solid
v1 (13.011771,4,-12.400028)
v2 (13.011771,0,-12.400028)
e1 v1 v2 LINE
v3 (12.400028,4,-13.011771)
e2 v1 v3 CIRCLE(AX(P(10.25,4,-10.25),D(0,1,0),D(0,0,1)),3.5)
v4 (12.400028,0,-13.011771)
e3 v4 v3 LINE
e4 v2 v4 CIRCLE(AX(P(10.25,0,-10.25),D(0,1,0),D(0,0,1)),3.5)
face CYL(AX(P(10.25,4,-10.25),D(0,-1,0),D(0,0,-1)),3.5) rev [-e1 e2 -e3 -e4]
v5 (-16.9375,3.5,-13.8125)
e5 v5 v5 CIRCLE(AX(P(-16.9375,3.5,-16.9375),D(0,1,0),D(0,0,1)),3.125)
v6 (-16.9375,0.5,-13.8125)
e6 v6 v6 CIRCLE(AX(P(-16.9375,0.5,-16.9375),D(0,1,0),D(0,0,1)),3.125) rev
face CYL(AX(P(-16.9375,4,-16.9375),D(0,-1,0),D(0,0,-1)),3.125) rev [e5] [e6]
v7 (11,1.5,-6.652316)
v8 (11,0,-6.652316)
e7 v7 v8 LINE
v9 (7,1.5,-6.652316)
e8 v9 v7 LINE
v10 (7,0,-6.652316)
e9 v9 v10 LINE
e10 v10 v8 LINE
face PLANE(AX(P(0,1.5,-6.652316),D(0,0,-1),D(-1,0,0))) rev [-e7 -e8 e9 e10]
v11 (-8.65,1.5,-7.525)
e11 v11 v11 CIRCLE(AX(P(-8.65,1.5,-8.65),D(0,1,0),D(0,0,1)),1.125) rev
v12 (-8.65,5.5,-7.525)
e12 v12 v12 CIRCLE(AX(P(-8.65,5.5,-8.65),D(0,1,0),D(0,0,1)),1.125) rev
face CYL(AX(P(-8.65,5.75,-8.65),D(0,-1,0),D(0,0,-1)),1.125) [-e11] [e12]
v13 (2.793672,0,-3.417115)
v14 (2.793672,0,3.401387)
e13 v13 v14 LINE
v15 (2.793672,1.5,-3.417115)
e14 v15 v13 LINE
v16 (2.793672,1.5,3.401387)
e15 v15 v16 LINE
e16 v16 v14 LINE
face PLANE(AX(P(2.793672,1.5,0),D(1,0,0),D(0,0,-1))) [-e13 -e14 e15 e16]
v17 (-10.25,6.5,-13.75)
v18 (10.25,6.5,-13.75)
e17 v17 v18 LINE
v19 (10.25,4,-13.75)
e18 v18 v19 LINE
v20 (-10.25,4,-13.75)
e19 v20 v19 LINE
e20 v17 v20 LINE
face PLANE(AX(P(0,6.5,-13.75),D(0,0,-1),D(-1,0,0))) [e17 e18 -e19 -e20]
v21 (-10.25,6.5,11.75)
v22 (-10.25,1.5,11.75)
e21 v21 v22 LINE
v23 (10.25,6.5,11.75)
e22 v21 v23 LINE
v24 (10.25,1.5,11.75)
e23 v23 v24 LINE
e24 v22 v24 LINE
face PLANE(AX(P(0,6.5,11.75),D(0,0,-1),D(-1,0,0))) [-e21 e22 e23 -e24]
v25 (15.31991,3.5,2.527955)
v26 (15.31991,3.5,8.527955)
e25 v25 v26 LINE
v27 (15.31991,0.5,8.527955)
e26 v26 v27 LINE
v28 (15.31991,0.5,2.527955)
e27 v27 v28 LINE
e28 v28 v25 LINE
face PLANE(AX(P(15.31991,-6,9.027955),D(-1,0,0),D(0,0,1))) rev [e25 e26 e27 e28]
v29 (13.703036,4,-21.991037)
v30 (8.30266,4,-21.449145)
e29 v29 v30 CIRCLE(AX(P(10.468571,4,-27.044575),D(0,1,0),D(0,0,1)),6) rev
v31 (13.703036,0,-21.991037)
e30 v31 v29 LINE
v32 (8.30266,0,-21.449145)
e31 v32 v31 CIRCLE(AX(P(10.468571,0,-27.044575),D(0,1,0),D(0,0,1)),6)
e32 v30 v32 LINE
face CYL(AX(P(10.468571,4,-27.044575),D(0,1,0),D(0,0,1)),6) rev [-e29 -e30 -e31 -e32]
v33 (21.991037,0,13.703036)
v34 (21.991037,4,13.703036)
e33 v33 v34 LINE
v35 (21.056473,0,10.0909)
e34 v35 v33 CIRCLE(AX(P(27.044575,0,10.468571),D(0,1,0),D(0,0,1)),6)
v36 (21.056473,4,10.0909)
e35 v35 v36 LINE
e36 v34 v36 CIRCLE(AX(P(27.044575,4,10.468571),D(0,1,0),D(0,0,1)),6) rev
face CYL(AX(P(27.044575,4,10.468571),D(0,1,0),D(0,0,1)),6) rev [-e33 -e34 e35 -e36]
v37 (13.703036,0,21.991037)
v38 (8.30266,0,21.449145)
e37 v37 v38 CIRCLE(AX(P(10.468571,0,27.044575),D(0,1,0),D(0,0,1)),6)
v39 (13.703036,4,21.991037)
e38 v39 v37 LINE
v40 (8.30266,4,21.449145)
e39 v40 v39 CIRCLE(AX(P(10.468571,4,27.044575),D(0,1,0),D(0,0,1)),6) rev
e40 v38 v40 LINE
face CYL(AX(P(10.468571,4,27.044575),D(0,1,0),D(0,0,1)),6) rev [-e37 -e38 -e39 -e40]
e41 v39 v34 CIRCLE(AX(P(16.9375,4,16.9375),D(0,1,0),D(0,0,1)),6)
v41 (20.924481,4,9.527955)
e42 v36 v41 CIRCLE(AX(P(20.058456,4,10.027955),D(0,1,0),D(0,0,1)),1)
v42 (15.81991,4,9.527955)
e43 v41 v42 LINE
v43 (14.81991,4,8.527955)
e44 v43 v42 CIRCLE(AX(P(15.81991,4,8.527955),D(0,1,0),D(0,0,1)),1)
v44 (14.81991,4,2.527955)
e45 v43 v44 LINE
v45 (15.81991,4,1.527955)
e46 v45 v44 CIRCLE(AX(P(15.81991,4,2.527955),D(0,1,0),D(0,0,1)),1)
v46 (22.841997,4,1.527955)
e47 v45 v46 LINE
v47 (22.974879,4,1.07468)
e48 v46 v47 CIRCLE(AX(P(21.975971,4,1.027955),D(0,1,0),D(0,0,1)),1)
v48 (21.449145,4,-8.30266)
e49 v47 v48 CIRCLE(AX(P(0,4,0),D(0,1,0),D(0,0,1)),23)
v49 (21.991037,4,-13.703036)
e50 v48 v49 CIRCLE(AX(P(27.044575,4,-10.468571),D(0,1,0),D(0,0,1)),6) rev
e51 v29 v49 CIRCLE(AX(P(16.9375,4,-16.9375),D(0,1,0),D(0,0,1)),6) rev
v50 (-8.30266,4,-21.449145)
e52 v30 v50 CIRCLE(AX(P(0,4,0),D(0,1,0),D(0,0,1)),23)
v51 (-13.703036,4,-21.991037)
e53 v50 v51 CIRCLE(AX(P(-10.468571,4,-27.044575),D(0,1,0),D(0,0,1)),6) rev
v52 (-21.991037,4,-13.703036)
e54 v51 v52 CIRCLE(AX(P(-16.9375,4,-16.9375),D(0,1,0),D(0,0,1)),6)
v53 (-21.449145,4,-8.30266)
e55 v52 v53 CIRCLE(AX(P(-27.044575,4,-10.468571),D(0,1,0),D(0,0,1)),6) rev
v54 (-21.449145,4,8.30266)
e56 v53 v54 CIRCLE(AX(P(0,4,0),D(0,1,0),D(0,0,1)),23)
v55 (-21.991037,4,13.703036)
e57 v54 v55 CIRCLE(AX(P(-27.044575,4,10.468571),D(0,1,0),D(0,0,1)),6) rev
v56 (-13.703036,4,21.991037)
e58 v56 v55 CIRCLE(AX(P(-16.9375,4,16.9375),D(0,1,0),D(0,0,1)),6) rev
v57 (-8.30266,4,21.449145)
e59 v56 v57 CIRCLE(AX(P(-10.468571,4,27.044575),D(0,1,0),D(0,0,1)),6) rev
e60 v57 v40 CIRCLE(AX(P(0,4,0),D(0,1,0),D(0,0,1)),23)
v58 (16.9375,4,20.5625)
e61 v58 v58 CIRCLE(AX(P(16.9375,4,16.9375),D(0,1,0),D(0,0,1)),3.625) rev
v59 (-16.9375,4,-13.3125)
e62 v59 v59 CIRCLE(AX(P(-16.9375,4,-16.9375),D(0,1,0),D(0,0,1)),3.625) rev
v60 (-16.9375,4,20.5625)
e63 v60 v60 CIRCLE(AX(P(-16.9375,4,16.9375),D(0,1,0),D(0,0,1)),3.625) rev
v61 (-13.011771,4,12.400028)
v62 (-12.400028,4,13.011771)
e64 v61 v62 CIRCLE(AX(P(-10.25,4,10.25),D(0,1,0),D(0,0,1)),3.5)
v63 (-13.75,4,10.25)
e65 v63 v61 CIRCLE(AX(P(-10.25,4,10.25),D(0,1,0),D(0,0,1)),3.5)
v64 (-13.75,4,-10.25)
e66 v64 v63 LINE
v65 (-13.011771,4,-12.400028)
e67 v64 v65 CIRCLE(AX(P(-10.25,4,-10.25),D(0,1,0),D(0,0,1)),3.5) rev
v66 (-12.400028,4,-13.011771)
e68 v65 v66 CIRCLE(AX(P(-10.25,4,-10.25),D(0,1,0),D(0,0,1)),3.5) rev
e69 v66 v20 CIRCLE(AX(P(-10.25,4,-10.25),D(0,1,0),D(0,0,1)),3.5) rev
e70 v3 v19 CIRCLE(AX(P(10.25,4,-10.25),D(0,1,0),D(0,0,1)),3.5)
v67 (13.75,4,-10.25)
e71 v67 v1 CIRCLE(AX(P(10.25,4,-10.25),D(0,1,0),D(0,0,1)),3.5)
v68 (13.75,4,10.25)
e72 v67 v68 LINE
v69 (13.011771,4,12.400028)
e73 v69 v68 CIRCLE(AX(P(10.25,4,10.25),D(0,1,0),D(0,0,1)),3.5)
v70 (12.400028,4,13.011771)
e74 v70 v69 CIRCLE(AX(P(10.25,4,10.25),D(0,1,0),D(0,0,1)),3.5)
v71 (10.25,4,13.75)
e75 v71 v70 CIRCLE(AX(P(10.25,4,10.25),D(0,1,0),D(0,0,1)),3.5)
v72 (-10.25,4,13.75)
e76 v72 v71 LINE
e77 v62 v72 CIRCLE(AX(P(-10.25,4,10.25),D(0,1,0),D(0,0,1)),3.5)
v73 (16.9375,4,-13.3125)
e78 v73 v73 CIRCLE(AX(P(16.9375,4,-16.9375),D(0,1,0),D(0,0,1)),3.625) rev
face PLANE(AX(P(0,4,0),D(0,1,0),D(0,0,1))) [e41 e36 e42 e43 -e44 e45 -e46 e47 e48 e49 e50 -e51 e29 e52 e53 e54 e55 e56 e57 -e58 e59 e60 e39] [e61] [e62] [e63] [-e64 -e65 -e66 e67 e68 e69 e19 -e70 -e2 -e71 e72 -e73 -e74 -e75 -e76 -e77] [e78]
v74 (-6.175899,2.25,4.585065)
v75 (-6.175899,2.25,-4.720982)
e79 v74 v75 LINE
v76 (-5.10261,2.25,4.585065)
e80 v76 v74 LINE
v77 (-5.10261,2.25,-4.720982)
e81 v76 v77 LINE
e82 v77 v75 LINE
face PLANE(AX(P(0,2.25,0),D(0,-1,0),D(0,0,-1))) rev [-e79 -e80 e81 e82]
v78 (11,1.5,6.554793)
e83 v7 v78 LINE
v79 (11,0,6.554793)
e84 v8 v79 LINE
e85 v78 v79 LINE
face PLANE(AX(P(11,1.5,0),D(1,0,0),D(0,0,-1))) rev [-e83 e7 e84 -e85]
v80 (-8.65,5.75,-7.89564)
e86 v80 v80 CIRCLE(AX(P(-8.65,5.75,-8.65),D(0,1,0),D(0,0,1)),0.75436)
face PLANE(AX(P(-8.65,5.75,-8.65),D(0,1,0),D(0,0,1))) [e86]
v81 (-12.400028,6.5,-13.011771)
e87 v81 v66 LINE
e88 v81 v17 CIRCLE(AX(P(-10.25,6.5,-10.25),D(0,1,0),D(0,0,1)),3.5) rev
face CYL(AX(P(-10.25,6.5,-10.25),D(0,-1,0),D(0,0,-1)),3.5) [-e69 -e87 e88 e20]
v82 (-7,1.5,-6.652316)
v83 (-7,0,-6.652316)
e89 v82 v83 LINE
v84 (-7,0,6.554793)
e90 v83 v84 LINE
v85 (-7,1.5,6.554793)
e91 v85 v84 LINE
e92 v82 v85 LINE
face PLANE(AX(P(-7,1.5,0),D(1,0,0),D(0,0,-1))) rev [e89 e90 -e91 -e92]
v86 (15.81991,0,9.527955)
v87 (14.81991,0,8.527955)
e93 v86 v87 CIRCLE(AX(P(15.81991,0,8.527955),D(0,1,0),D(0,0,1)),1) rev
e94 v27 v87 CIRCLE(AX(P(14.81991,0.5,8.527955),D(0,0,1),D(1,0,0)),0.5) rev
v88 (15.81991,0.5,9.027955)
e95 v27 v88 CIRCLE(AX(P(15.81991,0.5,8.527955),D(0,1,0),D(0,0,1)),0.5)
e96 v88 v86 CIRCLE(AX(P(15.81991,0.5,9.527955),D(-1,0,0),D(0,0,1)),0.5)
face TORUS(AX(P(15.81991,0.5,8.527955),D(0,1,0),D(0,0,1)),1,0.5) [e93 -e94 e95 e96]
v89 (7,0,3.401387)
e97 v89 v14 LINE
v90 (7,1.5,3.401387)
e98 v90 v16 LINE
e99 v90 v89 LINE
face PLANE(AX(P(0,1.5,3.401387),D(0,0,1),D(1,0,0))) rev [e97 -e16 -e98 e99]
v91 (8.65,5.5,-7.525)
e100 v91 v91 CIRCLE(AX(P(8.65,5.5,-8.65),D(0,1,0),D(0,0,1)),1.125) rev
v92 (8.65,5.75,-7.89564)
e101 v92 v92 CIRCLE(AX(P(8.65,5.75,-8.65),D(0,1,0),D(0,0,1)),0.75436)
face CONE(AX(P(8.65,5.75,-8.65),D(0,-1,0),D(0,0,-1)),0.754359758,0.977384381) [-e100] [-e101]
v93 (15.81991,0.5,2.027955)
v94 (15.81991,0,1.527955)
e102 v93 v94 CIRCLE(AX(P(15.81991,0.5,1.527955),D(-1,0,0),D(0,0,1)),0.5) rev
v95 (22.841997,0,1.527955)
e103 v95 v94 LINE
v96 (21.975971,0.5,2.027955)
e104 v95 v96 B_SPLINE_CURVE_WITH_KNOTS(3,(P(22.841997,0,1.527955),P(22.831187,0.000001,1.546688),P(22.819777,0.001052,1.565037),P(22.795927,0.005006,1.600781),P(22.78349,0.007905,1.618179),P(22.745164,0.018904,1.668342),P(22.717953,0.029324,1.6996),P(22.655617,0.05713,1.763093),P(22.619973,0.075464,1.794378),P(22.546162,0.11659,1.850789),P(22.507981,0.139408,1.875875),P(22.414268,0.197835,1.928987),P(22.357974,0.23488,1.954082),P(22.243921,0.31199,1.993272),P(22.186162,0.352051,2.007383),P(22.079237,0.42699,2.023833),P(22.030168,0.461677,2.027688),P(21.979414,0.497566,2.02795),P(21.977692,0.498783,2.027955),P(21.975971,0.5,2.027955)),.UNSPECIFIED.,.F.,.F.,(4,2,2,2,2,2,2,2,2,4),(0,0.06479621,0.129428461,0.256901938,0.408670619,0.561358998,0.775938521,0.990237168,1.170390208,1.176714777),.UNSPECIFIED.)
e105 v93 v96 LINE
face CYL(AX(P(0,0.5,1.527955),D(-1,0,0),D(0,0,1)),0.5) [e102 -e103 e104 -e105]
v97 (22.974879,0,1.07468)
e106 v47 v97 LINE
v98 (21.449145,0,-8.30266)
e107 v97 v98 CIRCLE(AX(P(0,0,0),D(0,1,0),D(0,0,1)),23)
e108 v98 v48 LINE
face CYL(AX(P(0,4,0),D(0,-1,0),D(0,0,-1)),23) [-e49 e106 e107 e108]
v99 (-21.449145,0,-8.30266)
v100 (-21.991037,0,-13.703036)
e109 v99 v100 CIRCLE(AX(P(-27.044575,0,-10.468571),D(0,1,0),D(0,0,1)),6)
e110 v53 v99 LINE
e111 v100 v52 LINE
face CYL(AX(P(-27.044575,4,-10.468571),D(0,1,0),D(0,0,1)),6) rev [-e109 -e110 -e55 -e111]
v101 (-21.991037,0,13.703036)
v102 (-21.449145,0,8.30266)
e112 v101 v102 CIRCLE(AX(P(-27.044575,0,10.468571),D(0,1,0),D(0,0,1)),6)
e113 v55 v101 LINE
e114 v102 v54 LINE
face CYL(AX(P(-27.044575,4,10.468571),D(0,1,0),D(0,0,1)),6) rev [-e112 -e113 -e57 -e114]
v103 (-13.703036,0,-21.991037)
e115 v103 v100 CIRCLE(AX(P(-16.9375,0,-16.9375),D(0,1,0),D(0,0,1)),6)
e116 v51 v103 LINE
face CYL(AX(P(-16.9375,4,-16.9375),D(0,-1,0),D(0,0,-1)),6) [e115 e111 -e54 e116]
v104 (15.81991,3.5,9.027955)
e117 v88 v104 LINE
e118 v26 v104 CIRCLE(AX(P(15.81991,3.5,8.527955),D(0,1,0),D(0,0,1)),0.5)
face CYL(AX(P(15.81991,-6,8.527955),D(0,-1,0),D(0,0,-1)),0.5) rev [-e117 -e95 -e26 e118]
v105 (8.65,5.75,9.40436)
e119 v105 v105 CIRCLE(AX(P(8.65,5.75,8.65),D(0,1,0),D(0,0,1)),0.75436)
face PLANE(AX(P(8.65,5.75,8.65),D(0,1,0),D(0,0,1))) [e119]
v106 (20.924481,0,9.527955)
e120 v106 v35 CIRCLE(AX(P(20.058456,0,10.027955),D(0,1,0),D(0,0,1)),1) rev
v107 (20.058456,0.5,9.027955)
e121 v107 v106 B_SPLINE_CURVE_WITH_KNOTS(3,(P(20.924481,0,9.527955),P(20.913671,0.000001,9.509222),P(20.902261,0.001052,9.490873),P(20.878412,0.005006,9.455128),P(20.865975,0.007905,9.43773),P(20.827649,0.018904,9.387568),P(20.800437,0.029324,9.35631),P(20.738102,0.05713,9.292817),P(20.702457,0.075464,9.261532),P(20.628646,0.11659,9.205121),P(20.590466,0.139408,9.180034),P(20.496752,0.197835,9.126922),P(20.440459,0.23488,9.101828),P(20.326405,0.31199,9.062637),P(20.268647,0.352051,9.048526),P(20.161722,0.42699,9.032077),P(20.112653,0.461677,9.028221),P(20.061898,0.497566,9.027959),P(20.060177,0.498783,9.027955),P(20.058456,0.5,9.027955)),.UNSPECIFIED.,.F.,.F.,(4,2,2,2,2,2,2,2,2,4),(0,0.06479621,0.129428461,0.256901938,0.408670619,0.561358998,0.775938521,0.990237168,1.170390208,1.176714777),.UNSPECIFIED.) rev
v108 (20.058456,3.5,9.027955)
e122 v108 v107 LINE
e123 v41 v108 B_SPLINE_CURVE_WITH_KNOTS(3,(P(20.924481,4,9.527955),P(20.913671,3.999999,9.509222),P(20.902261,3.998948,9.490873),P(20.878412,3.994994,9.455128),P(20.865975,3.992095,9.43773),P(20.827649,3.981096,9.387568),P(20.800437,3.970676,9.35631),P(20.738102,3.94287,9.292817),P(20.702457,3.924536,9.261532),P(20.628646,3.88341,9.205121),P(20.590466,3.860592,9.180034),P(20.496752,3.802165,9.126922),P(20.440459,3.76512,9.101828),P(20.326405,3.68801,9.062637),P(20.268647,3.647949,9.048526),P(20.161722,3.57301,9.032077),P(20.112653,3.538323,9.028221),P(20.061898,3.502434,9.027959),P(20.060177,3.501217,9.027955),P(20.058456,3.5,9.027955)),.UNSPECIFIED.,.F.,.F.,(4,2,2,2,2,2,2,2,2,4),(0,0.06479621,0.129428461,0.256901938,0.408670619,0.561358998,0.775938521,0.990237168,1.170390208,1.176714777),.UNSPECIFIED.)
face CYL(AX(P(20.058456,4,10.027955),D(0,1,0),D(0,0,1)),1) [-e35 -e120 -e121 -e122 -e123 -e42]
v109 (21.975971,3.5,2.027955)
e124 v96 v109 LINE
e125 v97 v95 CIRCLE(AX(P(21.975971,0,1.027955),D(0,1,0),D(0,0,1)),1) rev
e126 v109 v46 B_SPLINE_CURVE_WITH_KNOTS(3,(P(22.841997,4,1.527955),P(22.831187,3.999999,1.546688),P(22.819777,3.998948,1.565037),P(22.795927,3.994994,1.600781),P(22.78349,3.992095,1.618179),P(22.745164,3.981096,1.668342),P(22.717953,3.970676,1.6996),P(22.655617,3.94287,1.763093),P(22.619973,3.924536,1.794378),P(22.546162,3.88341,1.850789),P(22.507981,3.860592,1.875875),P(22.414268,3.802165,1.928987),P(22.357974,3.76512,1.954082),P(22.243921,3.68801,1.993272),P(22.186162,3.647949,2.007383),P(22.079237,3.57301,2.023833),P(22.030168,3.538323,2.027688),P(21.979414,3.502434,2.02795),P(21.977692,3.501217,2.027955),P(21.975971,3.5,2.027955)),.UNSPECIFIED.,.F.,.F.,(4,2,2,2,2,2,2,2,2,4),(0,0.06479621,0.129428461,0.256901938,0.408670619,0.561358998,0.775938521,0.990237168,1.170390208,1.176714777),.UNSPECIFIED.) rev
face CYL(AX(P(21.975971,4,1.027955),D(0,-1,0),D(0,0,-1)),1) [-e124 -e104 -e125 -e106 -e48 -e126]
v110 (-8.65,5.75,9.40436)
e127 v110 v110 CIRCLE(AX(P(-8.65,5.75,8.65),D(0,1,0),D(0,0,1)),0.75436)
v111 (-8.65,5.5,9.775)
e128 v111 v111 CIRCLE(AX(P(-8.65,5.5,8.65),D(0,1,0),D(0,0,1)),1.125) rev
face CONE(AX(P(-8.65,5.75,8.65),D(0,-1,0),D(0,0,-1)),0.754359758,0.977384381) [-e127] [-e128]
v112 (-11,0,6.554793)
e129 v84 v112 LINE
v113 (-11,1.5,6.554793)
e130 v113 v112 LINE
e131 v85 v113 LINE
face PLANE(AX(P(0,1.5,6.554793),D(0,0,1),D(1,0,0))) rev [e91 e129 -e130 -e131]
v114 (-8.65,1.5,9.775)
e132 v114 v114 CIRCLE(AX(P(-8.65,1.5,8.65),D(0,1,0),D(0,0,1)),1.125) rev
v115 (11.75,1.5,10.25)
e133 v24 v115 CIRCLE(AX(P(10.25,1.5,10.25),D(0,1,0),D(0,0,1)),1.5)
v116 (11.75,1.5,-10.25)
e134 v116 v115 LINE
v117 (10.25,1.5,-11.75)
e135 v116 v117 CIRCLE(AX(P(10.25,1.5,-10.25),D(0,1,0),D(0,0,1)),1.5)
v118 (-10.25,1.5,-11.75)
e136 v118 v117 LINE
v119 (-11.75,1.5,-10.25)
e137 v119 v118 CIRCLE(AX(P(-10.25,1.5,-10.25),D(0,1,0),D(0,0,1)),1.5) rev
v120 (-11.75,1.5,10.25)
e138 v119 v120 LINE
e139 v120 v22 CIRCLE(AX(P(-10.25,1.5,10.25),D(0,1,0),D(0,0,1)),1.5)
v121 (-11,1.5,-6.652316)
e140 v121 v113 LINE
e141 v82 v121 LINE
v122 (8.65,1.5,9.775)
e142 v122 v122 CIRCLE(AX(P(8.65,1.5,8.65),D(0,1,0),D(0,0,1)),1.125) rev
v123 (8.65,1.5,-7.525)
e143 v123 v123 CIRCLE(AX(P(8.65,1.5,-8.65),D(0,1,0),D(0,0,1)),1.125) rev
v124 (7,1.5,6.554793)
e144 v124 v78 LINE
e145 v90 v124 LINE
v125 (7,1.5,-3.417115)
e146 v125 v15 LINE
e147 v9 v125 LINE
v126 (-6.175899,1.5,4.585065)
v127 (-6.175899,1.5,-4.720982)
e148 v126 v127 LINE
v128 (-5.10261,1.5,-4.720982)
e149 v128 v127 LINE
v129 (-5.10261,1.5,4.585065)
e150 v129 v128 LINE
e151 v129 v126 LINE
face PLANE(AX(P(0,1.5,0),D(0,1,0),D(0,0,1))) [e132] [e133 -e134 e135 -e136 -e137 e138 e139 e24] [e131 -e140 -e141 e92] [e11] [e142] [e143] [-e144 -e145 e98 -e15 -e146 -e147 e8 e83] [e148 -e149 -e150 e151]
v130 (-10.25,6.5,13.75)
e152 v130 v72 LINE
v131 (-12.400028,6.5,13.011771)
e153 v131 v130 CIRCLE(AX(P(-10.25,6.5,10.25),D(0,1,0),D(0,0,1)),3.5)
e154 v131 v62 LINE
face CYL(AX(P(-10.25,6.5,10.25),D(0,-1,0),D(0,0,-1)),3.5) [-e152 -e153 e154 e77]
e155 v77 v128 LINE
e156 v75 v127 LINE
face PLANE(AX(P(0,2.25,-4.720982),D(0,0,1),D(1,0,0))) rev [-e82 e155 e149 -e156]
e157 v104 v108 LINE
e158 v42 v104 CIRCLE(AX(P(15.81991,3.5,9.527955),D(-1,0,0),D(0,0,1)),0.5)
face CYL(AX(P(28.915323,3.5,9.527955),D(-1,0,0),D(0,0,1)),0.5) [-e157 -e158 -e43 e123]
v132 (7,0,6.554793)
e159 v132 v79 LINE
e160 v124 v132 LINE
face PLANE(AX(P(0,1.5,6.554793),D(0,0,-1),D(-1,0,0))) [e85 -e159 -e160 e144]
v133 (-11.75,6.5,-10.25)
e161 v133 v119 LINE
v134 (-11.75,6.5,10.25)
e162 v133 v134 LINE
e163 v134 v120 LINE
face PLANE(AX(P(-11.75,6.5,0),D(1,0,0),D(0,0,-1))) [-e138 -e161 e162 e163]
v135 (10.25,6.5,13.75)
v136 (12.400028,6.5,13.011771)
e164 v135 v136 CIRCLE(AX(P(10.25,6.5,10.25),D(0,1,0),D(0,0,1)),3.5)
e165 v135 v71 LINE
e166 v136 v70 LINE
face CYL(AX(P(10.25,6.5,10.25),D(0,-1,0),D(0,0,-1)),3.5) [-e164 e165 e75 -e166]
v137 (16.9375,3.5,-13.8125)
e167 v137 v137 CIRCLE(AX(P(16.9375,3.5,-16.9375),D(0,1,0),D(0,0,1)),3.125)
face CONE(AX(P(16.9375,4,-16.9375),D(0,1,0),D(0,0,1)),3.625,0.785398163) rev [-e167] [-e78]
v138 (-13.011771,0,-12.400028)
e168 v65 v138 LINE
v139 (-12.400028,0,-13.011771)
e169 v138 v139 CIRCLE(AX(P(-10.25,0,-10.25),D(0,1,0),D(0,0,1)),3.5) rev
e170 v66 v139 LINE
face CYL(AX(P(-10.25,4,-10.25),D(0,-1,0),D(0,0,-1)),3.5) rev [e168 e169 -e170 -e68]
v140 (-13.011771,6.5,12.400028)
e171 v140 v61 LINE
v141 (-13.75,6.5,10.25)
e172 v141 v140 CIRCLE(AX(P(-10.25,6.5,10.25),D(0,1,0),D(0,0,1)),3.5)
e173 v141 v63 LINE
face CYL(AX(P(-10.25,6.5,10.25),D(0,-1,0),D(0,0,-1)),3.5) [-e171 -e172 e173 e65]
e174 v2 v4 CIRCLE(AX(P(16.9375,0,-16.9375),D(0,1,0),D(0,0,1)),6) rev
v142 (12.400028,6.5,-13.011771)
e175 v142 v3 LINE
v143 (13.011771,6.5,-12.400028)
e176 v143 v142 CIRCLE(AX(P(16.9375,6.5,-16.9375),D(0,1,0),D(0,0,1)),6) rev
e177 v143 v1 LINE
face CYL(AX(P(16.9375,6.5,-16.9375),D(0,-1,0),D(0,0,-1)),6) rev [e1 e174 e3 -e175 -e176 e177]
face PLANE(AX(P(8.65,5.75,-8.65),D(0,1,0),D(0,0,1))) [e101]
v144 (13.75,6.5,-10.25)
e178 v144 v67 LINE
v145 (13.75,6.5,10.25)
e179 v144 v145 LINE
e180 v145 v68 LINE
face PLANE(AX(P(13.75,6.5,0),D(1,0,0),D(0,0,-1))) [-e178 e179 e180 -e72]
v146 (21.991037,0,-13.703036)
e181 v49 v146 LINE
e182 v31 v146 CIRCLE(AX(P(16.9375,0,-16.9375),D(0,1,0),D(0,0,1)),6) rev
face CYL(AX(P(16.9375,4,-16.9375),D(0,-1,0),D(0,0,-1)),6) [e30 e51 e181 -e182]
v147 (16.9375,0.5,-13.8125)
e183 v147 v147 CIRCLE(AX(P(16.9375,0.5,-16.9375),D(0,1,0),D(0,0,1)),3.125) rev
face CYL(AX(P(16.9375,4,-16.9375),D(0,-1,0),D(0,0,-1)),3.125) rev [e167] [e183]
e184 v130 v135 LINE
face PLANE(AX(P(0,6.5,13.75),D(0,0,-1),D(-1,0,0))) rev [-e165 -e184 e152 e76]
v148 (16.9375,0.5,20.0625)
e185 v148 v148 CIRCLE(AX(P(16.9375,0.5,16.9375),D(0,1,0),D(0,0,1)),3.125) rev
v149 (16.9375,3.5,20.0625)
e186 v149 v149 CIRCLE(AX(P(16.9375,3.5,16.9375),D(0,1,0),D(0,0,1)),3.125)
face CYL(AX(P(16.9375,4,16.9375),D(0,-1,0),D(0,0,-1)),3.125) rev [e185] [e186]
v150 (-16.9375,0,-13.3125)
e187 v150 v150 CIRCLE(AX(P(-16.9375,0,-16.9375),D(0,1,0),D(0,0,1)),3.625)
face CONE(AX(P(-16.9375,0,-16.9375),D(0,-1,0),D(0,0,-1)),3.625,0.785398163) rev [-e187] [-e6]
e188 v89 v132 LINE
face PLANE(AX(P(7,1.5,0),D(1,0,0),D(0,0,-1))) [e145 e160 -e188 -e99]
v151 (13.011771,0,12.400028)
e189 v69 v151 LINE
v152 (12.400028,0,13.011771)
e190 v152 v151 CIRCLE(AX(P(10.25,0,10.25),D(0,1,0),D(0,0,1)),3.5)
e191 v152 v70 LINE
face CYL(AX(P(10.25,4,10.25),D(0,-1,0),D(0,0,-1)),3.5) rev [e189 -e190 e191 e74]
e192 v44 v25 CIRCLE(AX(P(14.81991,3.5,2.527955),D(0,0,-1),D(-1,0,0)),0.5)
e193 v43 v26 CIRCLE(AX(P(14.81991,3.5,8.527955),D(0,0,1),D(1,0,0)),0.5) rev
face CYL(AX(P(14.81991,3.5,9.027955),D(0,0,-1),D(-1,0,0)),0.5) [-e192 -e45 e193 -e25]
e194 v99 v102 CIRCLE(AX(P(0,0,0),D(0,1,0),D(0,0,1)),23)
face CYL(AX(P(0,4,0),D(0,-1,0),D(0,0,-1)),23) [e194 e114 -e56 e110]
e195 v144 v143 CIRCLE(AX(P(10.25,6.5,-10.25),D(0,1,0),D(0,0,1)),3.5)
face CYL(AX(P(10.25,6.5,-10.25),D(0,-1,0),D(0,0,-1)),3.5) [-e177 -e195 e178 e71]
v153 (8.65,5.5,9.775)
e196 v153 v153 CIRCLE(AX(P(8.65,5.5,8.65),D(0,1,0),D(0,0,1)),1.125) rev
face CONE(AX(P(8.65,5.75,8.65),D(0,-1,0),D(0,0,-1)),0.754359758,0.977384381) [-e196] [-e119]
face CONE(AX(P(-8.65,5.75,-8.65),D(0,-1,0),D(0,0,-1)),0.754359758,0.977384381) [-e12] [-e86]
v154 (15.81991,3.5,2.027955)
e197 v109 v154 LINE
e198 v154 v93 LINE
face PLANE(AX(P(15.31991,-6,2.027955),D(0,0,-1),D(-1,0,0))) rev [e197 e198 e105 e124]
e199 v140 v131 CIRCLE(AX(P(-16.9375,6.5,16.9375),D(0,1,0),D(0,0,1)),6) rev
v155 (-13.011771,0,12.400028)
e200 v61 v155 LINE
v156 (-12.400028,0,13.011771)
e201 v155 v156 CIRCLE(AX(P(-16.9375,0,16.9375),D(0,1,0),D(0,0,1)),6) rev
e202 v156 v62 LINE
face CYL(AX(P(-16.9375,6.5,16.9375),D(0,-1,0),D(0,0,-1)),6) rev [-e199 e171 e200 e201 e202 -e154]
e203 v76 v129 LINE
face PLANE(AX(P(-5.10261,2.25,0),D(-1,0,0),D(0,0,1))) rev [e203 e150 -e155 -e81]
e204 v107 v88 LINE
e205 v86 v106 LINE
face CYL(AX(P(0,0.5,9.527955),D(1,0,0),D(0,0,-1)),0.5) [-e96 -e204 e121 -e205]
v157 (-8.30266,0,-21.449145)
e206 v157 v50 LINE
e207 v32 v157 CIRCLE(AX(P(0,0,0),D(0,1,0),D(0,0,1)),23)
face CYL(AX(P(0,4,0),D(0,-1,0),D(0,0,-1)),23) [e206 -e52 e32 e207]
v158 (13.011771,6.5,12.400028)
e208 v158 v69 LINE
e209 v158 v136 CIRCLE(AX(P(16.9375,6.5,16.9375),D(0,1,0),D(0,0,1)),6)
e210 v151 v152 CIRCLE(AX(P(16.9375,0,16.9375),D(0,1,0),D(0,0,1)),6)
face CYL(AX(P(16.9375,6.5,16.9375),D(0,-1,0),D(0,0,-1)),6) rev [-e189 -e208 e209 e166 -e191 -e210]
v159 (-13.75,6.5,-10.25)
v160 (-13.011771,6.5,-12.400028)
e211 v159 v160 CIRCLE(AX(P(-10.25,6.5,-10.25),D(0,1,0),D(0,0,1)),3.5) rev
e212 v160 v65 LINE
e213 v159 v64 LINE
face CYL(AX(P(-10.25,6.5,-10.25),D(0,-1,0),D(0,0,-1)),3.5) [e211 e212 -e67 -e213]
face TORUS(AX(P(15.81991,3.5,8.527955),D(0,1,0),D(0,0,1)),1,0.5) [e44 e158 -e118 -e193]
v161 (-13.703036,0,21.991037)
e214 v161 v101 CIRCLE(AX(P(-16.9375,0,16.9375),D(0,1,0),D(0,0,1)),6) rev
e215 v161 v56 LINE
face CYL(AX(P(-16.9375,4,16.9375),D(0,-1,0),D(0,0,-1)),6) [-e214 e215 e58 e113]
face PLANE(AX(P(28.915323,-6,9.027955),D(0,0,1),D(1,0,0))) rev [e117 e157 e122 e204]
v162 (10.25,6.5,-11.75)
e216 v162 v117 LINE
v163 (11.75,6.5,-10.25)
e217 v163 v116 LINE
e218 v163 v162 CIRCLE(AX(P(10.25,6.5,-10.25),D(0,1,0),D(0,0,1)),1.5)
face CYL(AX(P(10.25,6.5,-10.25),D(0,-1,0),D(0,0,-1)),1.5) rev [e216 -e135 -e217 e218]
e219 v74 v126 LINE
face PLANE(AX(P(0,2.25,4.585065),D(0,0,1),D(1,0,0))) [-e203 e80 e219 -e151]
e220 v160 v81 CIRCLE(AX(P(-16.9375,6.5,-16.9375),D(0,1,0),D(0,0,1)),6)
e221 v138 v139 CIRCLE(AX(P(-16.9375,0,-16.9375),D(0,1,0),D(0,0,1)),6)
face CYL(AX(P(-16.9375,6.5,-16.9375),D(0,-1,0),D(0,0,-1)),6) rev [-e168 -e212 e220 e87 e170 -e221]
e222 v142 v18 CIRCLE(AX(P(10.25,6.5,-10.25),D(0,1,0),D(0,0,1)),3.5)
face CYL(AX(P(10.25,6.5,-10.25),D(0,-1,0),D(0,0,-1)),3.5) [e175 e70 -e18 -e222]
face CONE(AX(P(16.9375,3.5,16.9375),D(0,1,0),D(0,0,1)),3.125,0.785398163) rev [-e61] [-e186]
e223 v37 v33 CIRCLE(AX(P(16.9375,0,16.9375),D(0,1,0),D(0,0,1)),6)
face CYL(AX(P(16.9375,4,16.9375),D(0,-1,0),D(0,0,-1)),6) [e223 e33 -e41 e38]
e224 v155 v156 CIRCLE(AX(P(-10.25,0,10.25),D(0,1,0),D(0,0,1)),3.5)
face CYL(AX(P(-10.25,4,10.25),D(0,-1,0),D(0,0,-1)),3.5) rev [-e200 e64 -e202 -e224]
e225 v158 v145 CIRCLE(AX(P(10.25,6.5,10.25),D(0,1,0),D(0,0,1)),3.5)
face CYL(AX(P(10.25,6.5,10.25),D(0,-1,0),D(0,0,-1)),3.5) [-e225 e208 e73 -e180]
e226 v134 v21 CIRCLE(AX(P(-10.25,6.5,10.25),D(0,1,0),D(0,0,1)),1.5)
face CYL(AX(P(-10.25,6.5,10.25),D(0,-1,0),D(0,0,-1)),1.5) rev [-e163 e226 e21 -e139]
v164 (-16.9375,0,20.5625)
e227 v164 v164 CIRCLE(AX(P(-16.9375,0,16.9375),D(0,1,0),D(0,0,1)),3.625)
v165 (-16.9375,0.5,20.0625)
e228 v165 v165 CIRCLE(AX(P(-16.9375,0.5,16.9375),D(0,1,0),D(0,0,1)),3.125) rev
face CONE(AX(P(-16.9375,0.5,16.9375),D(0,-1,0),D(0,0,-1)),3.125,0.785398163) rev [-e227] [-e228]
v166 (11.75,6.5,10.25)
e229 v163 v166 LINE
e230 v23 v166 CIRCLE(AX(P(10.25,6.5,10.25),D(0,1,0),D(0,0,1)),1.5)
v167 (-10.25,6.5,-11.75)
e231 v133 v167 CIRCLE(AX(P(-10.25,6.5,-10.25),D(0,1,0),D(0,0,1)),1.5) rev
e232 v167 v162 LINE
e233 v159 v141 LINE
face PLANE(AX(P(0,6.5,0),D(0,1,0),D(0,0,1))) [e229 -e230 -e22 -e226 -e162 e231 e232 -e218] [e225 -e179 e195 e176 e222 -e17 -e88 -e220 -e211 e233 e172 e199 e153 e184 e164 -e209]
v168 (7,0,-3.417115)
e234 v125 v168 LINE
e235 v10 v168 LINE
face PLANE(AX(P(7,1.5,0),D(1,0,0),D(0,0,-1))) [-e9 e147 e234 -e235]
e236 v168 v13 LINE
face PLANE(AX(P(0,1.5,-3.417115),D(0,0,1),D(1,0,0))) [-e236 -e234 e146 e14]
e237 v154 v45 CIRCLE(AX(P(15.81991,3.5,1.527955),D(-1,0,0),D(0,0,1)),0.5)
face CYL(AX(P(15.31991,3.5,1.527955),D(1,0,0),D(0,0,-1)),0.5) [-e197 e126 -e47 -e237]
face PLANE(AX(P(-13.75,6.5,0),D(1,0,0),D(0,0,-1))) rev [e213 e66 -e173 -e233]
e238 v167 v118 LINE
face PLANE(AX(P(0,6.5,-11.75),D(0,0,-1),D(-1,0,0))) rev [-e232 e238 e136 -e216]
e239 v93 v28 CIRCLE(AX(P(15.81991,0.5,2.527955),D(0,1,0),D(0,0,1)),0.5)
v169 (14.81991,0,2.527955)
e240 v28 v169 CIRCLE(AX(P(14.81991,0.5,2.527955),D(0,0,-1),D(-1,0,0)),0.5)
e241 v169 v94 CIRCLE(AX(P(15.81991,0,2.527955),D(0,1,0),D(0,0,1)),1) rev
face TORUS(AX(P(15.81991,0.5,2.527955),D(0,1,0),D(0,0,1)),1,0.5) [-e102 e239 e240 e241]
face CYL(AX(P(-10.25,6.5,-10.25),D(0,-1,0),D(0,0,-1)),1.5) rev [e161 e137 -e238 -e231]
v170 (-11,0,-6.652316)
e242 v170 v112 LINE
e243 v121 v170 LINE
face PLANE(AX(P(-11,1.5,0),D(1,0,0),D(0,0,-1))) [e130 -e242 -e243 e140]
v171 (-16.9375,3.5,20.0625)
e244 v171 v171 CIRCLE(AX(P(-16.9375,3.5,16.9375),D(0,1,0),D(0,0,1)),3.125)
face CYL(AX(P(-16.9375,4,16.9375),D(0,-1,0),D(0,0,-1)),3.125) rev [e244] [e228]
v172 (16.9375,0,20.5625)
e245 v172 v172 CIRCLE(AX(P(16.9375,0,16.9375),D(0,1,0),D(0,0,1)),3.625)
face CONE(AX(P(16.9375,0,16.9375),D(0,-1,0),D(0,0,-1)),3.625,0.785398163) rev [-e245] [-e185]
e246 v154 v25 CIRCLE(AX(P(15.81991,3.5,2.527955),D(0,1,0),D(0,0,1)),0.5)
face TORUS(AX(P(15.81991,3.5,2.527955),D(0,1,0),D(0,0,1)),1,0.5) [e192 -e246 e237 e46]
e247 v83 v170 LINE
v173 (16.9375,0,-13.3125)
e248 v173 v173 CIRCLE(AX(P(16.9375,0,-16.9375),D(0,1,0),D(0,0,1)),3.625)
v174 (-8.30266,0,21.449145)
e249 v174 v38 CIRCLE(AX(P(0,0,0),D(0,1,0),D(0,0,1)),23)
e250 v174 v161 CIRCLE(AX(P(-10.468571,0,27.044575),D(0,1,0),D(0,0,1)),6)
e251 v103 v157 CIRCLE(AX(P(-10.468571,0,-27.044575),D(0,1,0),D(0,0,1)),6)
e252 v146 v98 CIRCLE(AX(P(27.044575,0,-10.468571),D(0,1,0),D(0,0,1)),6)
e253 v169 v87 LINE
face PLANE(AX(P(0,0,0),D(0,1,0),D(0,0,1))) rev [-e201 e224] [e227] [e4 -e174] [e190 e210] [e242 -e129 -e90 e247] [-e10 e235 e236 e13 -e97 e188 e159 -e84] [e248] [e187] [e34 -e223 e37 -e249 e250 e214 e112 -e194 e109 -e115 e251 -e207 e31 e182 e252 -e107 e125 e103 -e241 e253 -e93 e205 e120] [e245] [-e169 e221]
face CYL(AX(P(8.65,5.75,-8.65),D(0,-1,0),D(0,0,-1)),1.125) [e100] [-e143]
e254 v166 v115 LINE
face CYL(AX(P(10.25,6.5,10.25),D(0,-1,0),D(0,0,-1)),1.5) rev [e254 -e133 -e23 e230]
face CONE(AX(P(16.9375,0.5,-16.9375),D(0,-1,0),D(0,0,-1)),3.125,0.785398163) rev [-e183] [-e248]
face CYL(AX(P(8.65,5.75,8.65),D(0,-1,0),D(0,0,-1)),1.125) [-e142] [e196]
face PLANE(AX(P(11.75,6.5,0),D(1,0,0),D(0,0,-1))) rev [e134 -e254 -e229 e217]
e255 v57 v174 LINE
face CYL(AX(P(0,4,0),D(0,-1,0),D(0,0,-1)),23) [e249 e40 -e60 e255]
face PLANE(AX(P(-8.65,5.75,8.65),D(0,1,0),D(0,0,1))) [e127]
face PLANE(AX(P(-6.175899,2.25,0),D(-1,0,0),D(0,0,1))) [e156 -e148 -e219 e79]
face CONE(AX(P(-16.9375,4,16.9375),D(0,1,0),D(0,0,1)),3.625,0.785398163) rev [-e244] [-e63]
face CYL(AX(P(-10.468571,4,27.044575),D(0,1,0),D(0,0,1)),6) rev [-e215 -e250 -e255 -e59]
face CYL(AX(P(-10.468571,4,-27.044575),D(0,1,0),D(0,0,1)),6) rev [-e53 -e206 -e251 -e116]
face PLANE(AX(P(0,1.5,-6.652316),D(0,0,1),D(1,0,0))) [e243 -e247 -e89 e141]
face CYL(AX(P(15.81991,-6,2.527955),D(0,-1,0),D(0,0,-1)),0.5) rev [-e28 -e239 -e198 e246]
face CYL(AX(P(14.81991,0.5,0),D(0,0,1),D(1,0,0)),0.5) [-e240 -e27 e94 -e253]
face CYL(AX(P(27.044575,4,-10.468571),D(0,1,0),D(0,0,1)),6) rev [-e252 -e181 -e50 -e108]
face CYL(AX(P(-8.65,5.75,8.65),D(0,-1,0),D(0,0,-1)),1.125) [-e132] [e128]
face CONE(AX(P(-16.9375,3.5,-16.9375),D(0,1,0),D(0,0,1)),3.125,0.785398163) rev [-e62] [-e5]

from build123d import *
from OCP.BRepFilletAPI import BRepFilletAPI_MakeChamfer

# Parameters (mm, degrees)
SKETCH1_W           = 4
SKETCH1_H           = 13.20710931
BOSS_EXTRUDE1_DEPTH = 1.5
BOSS_EXTRUDE7_START = 1.5
SKETCH1_10_W        = 1.073289239
SKETCH1_10_H        = 9.306047289
BOSS_EXTRUDE7_DEPTH = 0.75
BOSS_EXTRUDE4_DEPTH = 6.5
SKETCH1_7_R         = 3.125
BOSS_EXTRUDE5_DEPTH = 4
SKETCH1_8_R         = 1.125
BOSS_EXTRUDE6_DEPTH = 5.75
CHAMFER1_SIZE       = 0.25
CHAMFER1_SIZE2      = 0.370640242
CHAMFER2_SIZE       = 0.5
FILLET1_R           = 6
SKETCH2_W           = 13.595412958
SKETCH2_H           = 7
CUT_EXTRUDE1_DEPTH  = 10
FILLET2_R           = 0.5
FILLET3_START       = -1
FILLET3_DEPTH       = 6


with BuildPart() as part:
    # Sketch1 → Boss-Extrude1 (new body)
    with BuildSketch(Plane(origin=(0, 0, 0), x_dir=(1, 0, 0), z_dir=(0, 1, 0))):
        with BuildLine():
            Line((10.25, 11.75), (-10.25, 11.75))
            ThreePointArc((-10.25, 11.75), (-11.310660172, 11.310660172), (-11.75, 10.25))
            Line((-11.75, 10.25), (-11.75, -10.25))
            ThreePointArc((-11.75, -10.25), (-11.310660172, -11.310660172), (-10.25, -11.75))
            Line((-10.25, -11.75), (10.25, -11.75))
            ThreePointArc((10.25, -11.75), (11.310660172, -11.310660172), (11.75, -10.25))
            Line((11.75, -10.25), (11.75, 10.25))
            ThreePointArc((11.75, 10.25), (11.310660172, 11.310660172), (10.25, 11.75))
        make_face()
        with Locations((-9, 0.048761158)):
            Rectangle(SKETCH1_W, SKETCH1_H, mode=Mode.SUBTRACT)
        Polygon((11, -6.554793497), (7, -6.554793497), (7, -3.401386803), (2.793672018, -3.401386803), (2.793672018, 3.417114723), (7, 3.417114723), (7, 6.652315813), (11, 6.652315813), align=None, mode=Mode.SUBTRACT)
    extrude(amount=BOSS_EXTRUDE1_DEPTH)

    # Sketch1<10> → Boss-Extrude7 (add)
    with BuildSketch(Plane(origin=(0, 0, 0), x_dir=(1, 0, 0), z_dir=(0, 1, 0)).offset(BOSS_EXTRUDE7_START)):
        with Locations((-5.639254257, 0.06795853)):
            Rectangle(SKETCH1_10_W, SKETCH1_10_H)
    extrude(amount=BOSS_EXTRUDE7_DEPTH)

    # Sketch1<6> → Boss-Extrude4 (add)
    with BuildSketch(Plane(origin=(0, 0, 0), x_dir=(1, 0, 0), z_dir=(0, 1, 0))):
        with BuildLine():
            Line((10.25, 13.75), (-10.25, 13.75))
            ThreePointArc((-10.25, 13.75), (-11.386617955, 13.560302044), (-12.400027852, 13.011771214))
            ThreePointArc((-12.400027852, 13.011771214), (-12.694859313, 12.694859313), (-13.011771214, 12.400027852))
            ThreePointArc((-13.011771214, 12.400027852), (-13.560302044, 11.386617955), (-13.75, 10.25))
            Line((-13.75, 10.25), (-13.75, -10.25))
            ThreePointArc((-13.75, -10.25), (-13.560302044, -11.386617955), (-13.011771214, -12.400027852))
            ThreePointArc((-13.011771214, -12.400027852), (-12.694859313, -12.694859313), (-12.400027852, -13.011771214))
            ThreePointArc((-12.400027852, -13.011771214), (-11.386617955, -13.560302044), (-10.25, -13.75))
            Line((-10.25, -13.75), (10.25, -13.75))
            ThreePointArc((10.25, -13.75), (11.386617955, -13.560302044), (12.400027852, -13.011771214))
            ThreePointArc((12.400027852, -13.011771214), (12.694859313, -12.694859313), (13.011771214, -12.400027852))
            ThreePointArc((13.011771214, -12.400027852), (13.560302044, -11.386617955), (13.75, -10.25))
            Line((13.75, -10.25), (13.75, 10.25))
            ThreePointArc((13.75, 10.25), (13.560302044, 11.386617955), (13.011771214, 12.400027852))
            ThreePointArc((13.011771214, 12.400027852), (12.694859313, 12.694859313), (12.400027852, 13.011771214))
            ThreePointArc((12.400027852, 13.011771214), (11.386617955, 13.560302044), (10.25, 13.75))
        make_face()
        with BuildLine():
            ThreePointArc((-11.75, 10.25), (-11.310660172, 11.310660172), (-10.25, 11.75))
            Line((-10.25, 11.75), (10.25, 11.75))
            ThreePointArc((10.25, 11.75), (11.310660172, 11.310660172), (11.75, 10.25))
            Line((11.75, 10.25), (11.75, -10.25))
            ThreePointArc((11.75, -10.25), (11.310660172, -11.310660172), (10.25, -11.75))
            Line((10.25, -11.75), (-10.25, -11.75))
            ThreePointArc((-10.25, -11.75), (-11.310660172, -11.310660172), (-11.75, -10.25))
            Line((-11.75, -10.25), (-11.75, 10.25))
        make_face(mode=Mode.SUBTRACT)
    extrude(amount=BOSS_EXTRUDE4_DEPTH)

    # Sketch1<7> → Boss-Extrude5 (add)
    with BuildSketch(Plane(origin=(0, 0, 0), x_dir=(1, 0, 0), z_dir=(0, 1, 0))):
        with BuildLine():
            ThreePointArc((19.817252096, -11.673753439), (23, 0), (19.817252096, 11.673753439))
            ThreePointArc((19.817252096, 11.673753439), (21.180140687, 21.180140687), (11.673753439, 19.817252096))
            ThreePointArc((11.673753439, 19.817252096), (0, 23), (-11.673753439, 19.817252096))
            ThreePointArc((-11.673753439, 19.817252096), (-21.180140687, 21.180140687), (-19.817252096, 11.673753439))
            ThreePointArc((-19.817252096, 11.673753439), (-23, 0), (-19.817252096, -11.673753439))
            ThreePointArc((-19.817252096, -11.673753439), (-21.180140687, -21.180140687), (-11.673753439, -19.817252096))
            ThreePointArc((-11.673753439, -19.817252096), (0, -23), (11.673753439, -19.817252096))
            ThreePointArc((11.673753439, -19.817252096), (21.180140687, -21.180140687), (19.817252096, -11.673753439))
        make_face()
        with BuildLine():
            Line((-10.25, 13.75), (10.25, 13.75))
            ThreePointArc((10.25, 13.75), (12.724873734, 12.724873734), (13.75, 10.25))
            Line((13.75, 10.25), (13.75, -10.25))
            ThreePointArc((13.75, -10.25), (12.724873734, -12.724873734), (10.25, -13.75))
            Line((10.25, -13.75), (-10.25, -13.75))
            ThreePointArc((-10.25, -13.75), (-12.724873734, -12.724873734), (-13.75, -10.25))
            Line((-13.75, -10.25), (-13.75, 10.25))
            ThreePointArc((-13.75, 10.25), (-12.724873734, 12.724873734), (-10.25, 13.75))
        make_face(mode=Mode.SUBTRACT)
        with Locations(Location((-16.9375, -16.9375, 0), (0, 0, 270))):
            Circle(SKETCH1_7_R, mode=Mode.SUBTRACT)
        with Locations(Location((-16.9375, 16.9375, 0), (0, 0, 270))):
            Circle(SKETCH1_7_R, mode=Mode.SUBTRACT)
        with Locations(Location((16.9375, 16.9375, 0), (0, 0, 270))):
            Circle(SKETCH1_7_R, mode=Mode.SUBTRACT)
        with Locations(Location((16.9375, -16.9375, 0), (0, 0, 270))):
            Circle(SKETCH1_7_R, mode=Mode.SUBTRACT)
    extrude(amount=BOSS_EXTRUDE5_DEPTH)

    # Sketch1<8> → Boss-Extrude6 (add)
    with BuildSketch(Plane(origin=(0, 0, 0), x_dir=(1, 0, 0), z_dir=(0, 1, 0))):
        with Locations(Location((-8.65, 8.65, 0), (0, 0, 270))):
            Circle(SKETCH1_8_R)
        with Locations(Location((8.65, 8.65, 0), (0, 0, 270))):
            Circle(SKETCH1_8_R)
        with Locations(Location((-8.65, -8.65, 0), (0, 0, 270))):
            Circle(SKETCH1_8_R)
        with Locations(Location((8.65, -8.65, 0), (0, 0, 270))):
            Circle(SKETCH1_8_R)
    extrude(amount=BOSS_EXTRUDE6_DEPTH)

    # Chamfer1: one chamfer whose edges measure the first distance from different faces: ONE call of the kernel's chamfer builder (chamfer() names one face for all edges)
    chamfer1_edges_1 = [part.edges().sort_by_distance(p)[0] for p in [
        (-8.65, 5.75, -9.775),
    ]]
    chamfer1_side_1 = [part.faces().sort_by_distance(p)[0] for p in [
        (-8.65, 3.625, -9.775),
    ]]
    chamfer1_edges_2 = [part.edges().sort_by_distance(p)[0] for p in [
        (8.65, 5.75, -9.775),
    ]]
    chamfer1_side_2 = [part.faces().sort_by_distance(p)[0] for p in [
        (8.65, 3.625, -9.775),
    ]]
    chamfer1_edges_3 = [part.edges().sort_by_distance(p)[0] for p in [
        (8.65, 5.75, 7.525),
    ]]
    chamfer1_side_3 = [part.faces().sort_by_distance(p)[0] for p in [
        (8.65, 3.625, 7.525),
    ]]
    chamfer1_edges_4 = [part.edges().sort_by_distance(p)[0] for p in [
        (-8.65, 5.75, 7.525),
    ]]
    chamfer1_side_4 = [part.faces().sort_by_distance(p)[0] for p in [
        (-8.65, 3.625, 7.525),
    ]]
    chamfer1 = BRepFilletAPI_MakeChamfer(part.part.solid().wrapped)
    for e in chamfer1_edges_1:
        chamfer1.Add(CHAMFER1_SIZE, CHAMFER1_SIZE2, e.wrapped, chamfer1_side_1[0].wrapped)  # the first distance lies on this face
    for e in chamfer1_edges_2:
        chamfer1.Add(CHAMFER1_SIZE, CHAMFER1_SIZE2, e.wrapped, chamfer1_side_2[0].wrapped)  # the first distance lies on this face
    for e in chamfer1_edges_3:
        chamfer1.Add(CHAMFER1_SIZE, CHAMFER1_SIZE2, e.wrapped, chamfer1_side_3[0].wrapped)  # the first distance lies on this face
    for e in chamfer1_edges_4:
        chamfer1.Add(CHAMFER1_SIZE, CHAMFER1_SIZE2, e.wrapped, chamfer1_side_4[0].wrapped)  # the first distance lies on this face
    add(Compound.cast(chamfer1.Shape()), mode=Mode.REPLACE)

    # Chamfer2
    chamfer2_edges = [part.edges().sort_by_distance(p)[0] for p in [
        (16.9375, 4, 13.8125),
        (-16.9375, 0, 13.8125),
        (16.9375, 0, -20.0625),
        (-16.9375, 4, -20.0625),
        (16.9375, 4, -20.0625),
        (-16.9375, 4, 13.8125),
        (-16.9375, 0, -20.0625),
        (16.9375, 0, 13.8125),
    ]]
    chamfer(chamfer2_edges, length=CHAMFER2_SIZE)

    # Fillet1
    fillet1_edges = [part.edges().sort_by_distance(p)[0] for p in [
        (11.673753439, 2, -19.817252096),
        (-11.673753439, 2, -19.817252096),
        (-19.817252096, 2, -11.673753439),
        (-19.817252096, 2, 11.673753439),
        (-11.673753439, 2, 19.817252096),
        (11.673753439, 2, 19.817252096),
        (19.817252096, 2, 11.673753439),
        (19.817252096, 2, -11.673753439),
    ]]
    fillet(fillet1_edges, radius=FILLET1_R)

    # Sketch2 → Cut-Extrude1 (cut)
    with BuildSketch(Plane(origin=(0, 4, 0), x_dir=(1, 0, 0), z_dir=(0, 1, 0))):
        with Locations((22.11761689, -5.52795482)):
            Rectangle(SKETCH2_W, SKETCH2_H)
    extrude(amount=-CUT_EXTRUDE1_DEPTH, mode=Mode.SUBTRACT)

    # Fillet2
    fillet2_edges = [part.edges().sort_by_distance(p)[0] for p in [
        (15.319910411, 0, 5.52795482),
        (15.319910411, 2, 9.02795482),
        (19.115165802, 0, 2.02795482),
        (15.319910411, 2, 2.02795482),
        (18.270000077, 0, 9.02795482),
        (19.115165802, 4, 2.02795482),
        (15.319910411, 4, 5.52795482),
        (18.270000077, 4, 9.02795482),
    ]]
    fillet(fillet2_edges, radius=FILLET2_R)

    # Fillet3: read off the stored shape, not the designer's step
    # Fillet3 outline → Fillet3 (cut)
    with BuildSketch(Plane(origin=(0, 0, 0), x_dir=(1, 0, 0), z_dir=(0, 1, 0)).offset(FILLET3_START)):
        with BuildLine():
            ThreePointArc((22.910420735, -2.027959995), (22.947600473, -1.551654765), (22.974878951, -1.074680039))
            ThreePointArc((22.974878951, -1.074680039), (22.666360474, -1.751392868), (21.975971171, -2.02795482))
            Line((21.975971171, -2.02795482), (22.910420735, -2.027959995))
        make_face()
        with BuildLine():
            ThreePointArc((20.058455778, -9.02795482), (20.787477444, -9.343464199), (21.056472764, -10.090899999))
            ThreePointArc((21.056472764, -10.090899999), (21.114417887, -9.555751044), (21.220091225, -9.027948821))
            Line((21.220091225, -9.027948821), (20.058455778, -9.02795482))
        make_face()
    extrude(amount=FILLET3_DEPTH, mode=Mode.SUBTRACT)


solid = part.part
